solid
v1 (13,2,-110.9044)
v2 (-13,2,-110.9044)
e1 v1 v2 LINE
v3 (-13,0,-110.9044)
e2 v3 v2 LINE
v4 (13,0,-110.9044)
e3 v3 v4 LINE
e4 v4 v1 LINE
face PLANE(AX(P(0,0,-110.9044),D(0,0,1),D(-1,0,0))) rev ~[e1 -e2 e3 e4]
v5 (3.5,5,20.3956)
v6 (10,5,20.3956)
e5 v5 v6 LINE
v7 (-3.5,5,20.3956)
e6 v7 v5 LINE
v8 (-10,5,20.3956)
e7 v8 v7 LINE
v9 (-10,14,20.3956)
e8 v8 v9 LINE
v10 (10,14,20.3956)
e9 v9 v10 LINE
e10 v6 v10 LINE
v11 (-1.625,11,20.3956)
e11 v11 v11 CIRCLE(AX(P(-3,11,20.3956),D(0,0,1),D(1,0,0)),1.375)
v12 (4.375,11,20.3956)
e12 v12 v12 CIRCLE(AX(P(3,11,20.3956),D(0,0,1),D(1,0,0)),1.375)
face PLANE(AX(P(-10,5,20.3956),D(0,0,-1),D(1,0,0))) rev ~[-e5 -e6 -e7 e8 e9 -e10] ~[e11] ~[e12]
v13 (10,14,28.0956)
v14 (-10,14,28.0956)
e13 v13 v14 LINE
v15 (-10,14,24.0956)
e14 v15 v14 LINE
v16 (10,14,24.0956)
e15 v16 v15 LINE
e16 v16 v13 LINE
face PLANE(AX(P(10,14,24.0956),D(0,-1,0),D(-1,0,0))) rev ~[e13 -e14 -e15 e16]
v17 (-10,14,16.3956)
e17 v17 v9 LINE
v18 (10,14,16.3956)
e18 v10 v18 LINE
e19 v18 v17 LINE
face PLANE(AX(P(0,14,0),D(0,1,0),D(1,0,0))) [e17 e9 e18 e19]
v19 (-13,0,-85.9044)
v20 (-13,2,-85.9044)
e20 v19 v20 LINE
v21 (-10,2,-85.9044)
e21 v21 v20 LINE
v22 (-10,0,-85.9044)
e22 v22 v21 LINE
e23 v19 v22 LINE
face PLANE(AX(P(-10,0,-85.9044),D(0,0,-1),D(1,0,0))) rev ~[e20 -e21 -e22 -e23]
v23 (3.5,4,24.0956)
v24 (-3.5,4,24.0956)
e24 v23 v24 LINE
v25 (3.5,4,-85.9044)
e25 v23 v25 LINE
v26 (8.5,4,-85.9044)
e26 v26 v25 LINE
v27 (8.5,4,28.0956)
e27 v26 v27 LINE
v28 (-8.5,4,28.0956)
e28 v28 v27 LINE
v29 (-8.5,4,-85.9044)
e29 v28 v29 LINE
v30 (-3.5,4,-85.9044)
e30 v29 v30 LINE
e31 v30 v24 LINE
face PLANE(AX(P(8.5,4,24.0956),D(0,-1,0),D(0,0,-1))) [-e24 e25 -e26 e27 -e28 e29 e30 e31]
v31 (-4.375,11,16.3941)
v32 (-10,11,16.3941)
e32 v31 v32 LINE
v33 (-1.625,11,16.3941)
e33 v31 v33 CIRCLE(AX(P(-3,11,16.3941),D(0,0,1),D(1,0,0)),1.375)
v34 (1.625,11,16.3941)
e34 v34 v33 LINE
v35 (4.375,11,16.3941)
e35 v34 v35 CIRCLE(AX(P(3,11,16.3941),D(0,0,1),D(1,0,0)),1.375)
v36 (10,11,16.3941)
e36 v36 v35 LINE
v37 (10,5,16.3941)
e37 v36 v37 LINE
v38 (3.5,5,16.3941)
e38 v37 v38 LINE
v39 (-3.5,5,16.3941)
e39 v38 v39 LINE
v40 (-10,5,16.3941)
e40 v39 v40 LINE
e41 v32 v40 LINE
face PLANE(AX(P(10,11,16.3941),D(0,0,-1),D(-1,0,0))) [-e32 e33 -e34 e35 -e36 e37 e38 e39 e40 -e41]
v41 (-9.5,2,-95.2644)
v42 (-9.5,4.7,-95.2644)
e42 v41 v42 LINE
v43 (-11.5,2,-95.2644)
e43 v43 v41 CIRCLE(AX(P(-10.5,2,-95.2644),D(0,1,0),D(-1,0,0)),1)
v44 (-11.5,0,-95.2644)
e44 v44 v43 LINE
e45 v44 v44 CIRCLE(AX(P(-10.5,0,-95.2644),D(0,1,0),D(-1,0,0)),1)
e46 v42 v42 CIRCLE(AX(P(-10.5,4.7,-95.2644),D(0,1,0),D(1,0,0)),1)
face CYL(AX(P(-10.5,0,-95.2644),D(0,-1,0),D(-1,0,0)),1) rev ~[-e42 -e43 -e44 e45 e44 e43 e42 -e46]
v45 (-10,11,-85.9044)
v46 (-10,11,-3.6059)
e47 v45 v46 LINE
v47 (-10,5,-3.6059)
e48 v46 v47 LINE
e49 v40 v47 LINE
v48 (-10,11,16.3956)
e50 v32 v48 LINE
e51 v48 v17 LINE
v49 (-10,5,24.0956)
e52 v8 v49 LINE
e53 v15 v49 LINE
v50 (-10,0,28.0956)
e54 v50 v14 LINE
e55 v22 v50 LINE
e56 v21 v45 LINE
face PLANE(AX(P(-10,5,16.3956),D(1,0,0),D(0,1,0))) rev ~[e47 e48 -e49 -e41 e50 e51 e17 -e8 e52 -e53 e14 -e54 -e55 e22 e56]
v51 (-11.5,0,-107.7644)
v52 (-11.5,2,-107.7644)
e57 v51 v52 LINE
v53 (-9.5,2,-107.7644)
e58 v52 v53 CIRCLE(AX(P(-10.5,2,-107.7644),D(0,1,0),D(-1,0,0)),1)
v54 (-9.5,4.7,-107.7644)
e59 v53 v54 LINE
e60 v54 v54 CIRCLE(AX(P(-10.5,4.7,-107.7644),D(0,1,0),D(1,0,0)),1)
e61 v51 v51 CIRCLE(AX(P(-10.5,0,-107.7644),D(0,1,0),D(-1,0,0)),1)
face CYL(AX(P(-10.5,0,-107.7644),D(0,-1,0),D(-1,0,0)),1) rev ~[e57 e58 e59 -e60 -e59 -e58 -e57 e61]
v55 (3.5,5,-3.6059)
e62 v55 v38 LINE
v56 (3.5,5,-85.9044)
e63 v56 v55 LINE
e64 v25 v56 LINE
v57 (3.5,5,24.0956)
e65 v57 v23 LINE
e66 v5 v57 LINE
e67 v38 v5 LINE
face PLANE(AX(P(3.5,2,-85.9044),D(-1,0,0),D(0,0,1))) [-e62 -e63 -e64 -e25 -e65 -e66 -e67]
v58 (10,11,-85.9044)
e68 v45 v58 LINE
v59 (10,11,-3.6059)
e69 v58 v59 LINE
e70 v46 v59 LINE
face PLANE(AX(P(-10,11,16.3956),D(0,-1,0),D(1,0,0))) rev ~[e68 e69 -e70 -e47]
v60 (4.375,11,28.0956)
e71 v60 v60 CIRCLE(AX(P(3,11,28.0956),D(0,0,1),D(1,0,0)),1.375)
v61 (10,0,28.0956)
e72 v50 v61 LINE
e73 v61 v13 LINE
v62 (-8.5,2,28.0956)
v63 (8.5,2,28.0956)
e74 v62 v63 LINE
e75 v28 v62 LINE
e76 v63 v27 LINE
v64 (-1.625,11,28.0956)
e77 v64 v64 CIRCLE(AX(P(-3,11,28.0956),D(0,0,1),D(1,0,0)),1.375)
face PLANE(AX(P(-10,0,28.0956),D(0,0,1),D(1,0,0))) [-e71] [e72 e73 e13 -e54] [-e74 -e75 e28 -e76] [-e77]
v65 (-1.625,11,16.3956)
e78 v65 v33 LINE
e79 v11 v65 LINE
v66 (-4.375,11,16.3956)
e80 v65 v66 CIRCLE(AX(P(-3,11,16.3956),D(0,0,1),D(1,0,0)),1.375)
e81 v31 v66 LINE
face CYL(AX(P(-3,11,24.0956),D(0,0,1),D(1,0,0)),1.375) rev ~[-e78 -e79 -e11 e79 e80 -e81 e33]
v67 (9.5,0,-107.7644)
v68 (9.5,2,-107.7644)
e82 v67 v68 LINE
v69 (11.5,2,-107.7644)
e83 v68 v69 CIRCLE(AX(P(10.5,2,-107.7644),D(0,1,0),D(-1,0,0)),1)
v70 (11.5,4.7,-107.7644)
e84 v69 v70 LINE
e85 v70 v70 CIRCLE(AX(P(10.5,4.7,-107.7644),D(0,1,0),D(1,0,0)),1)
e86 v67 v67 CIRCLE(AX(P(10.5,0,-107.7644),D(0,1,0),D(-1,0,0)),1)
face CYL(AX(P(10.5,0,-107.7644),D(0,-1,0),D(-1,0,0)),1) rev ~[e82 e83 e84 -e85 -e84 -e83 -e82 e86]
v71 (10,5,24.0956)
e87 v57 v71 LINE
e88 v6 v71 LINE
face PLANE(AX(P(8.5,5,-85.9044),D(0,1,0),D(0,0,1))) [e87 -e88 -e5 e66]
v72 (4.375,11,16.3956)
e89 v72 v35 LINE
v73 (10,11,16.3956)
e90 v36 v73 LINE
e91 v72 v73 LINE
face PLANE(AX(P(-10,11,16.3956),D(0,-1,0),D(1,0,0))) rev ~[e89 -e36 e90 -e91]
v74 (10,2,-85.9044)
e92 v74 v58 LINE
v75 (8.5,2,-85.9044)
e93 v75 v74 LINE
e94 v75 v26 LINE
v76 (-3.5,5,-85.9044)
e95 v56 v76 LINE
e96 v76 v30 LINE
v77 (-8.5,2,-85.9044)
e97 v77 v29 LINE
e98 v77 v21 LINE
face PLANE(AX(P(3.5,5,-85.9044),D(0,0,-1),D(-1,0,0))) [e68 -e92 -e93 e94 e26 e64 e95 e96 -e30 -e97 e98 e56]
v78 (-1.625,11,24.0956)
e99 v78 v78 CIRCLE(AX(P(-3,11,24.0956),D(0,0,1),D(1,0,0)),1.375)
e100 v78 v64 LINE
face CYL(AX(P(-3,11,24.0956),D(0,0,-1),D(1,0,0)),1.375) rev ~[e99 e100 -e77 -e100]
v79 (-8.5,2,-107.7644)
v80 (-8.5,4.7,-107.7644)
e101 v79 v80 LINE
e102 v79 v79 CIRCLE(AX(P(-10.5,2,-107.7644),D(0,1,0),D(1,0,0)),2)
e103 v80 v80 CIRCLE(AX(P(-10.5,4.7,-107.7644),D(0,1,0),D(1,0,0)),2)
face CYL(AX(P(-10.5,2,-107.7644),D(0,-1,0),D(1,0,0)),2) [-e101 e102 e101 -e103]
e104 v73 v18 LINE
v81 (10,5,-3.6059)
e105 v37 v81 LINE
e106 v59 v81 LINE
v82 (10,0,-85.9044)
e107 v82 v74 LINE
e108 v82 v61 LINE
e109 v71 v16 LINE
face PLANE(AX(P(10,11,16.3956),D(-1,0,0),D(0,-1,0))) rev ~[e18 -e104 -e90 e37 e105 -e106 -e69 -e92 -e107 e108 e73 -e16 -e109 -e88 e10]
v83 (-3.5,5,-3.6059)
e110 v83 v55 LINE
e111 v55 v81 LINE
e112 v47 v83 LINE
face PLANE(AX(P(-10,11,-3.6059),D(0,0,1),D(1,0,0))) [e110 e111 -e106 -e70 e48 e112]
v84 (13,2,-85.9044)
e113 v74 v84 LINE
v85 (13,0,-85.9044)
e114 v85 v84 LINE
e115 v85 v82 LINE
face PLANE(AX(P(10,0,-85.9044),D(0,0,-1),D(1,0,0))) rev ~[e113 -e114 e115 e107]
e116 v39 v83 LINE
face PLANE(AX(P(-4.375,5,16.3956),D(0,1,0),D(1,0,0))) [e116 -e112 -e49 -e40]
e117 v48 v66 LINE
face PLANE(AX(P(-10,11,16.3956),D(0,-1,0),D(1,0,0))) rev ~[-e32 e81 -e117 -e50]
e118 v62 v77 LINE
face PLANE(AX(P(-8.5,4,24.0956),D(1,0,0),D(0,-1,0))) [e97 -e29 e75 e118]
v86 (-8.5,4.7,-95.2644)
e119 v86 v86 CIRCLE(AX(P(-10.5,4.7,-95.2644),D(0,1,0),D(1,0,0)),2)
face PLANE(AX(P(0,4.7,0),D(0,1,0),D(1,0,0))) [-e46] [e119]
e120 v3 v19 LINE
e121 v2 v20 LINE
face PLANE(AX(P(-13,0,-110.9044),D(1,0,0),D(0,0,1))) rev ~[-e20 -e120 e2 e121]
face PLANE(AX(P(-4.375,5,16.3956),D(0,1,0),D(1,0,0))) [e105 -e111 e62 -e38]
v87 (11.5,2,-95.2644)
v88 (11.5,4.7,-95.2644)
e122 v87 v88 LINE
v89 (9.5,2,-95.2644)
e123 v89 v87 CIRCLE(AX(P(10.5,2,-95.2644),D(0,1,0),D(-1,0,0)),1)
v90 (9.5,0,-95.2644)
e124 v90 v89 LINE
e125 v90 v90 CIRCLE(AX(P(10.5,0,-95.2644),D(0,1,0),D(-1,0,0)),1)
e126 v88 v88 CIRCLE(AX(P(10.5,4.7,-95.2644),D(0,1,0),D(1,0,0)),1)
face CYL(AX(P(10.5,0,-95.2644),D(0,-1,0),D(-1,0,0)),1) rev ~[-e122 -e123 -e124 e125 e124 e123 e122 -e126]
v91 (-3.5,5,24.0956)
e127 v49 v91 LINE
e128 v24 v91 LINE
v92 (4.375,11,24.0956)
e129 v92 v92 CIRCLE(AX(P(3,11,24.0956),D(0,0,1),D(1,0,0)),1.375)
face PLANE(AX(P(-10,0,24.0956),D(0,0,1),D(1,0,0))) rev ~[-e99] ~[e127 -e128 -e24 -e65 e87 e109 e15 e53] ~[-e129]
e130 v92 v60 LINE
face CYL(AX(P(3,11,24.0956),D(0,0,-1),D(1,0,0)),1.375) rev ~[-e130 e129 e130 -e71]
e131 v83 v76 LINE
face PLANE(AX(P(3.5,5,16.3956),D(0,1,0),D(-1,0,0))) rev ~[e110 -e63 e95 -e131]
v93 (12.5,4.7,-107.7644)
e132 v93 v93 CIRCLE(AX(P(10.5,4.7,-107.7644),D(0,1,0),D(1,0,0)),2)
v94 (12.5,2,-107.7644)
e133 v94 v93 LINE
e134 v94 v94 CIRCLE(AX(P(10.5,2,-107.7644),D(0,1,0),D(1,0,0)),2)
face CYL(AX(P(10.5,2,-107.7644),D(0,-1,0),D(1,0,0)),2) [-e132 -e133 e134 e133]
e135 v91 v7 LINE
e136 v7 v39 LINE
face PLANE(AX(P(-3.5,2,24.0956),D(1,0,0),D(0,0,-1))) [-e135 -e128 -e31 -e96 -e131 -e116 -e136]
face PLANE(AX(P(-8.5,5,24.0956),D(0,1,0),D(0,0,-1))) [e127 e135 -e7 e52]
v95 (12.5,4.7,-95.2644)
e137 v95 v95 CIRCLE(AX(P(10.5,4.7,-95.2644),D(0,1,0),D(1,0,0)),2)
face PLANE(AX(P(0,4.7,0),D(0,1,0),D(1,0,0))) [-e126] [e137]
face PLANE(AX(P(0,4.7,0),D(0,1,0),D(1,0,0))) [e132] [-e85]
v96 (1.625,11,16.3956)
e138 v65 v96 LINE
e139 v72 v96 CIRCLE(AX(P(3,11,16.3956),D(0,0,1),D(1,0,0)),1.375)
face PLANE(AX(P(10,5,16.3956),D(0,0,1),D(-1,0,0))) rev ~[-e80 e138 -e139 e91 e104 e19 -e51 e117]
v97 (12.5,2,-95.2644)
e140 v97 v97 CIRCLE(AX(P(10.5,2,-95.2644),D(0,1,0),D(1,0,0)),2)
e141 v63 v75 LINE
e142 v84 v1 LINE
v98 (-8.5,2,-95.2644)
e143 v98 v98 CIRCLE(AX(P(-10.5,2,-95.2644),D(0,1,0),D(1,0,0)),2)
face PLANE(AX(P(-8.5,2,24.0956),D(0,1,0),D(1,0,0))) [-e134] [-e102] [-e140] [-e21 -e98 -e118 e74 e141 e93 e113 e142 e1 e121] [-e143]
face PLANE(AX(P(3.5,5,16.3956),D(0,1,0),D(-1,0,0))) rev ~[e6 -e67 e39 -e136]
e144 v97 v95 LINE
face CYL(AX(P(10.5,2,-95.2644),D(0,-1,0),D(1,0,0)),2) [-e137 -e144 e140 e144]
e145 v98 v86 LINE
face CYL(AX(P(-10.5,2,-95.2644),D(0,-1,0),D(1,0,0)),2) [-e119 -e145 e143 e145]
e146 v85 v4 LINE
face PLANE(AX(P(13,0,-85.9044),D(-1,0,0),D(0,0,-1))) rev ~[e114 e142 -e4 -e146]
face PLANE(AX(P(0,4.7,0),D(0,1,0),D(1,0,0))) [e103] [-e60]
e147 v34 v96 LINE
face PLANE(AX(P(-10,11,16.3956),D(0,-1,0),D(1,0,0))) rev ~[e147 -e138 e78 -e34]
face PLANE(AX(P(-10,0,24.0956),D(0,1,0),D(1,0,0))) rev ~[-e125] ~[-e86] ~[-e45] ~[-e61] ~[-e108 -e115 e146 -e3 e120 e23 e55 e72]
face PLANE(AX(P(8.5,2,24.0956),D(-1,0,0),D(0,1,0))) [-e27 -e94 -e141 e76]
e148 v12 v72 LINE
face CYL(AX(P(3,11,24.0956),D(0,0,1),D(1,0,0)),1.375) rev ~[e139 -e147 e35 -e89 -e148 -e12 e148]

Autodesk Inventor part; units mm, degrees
ref_plane "YZ Plane" through (0, 0, 0) normal (1, 0, 0) x (0, 1, 0)
ref_plane "XZ Plane" through (0, 0, 0) normal (0, 1, 0) x (-1, 0, 0)
ref_plane "XY Plane" through (0, 0, 0) normal (0, 0, 1) x (1, 0, 0)
sketch "スケッチ1" plane through (0, 0, 0) normal (0, 1, 0) x (-1, 0, 0)
  line L0 (8.5, 24.0956) -> (-8.5, 24.0956)
  line L1 (-8.5, 24.0956) -> (-8.5, -85.9044)
  line L2 (-8.5, -85.9044) -> (8.5, -85.9044)
  line L3 (8.5, -85.9044) -> (8.5, 24.0956)
  line L4 (13, -85.9044) -> (-13, -85.9044)
  line L5 (-13, -85.9044) -> (-13, -110.9044)
  line L6 (-13, -110.9044) -> (13, -110.9044)
  line L7 (13, -110.9044) -> (13, -85.9044)
  circle A0 centre (10.5, -95.2644) radius 1
  circle A1 centre (10.5, -107.7644) radius 1
  line L8 (0, -85.9044) -> (0, -110.9044)
  line L9 (-8.5, -85.9044) -> (-8.5, 24.0956)
  circle A2 centre (-10.5, -95.2644) radius 1
  circle A3 centre (-10.5, -107.7644) radius 1
  line L10 (0, -85.9044) -> (0, 24.0956)
  line L11 (10, -85.9044) -> (10, 24.0956)
  line L12 (10, 24.0956) -> (8.5, 24.0956)
  line L13 (-8.5, -85.9044) -> (-8.5, 24.0956)
  line L14 (-10, -85.9044) -> (-10, 24.0956)
  line L15 (-10, 24.0956) -> (-8.5, 24.0956)
  line L16 (10, 24.0956) -> (-10, 24.0956)
  line L17 (8.5, 24.0956) -> (-8.5, 24.0956)
  line L18 (10, 24.0956) -> (-10, 24.0956)
  point P0 (0, 0)
  point P1 (-8.5, 24.0956)
  dimension "d0" = 17
  dimension "d1" = 110
  dimension "d2" = 26
  dimension "d3" = 25
  dimension "d4" = 4.5
  dimension "d5" = 2
  dimension "d6" = 9.36
  dimension "d7" = 2
  dimension "d8" = 12.5
  dimension "d9" = 2.5
  dimension "d10" = 2.5
  dimension "d11" = 13
  dimension "d12" = 1.5
extrude "押し出し1" add sketch "スケッチ1" along normal blind 2 contours L3 L2 L10 L0 | L10 L2 L1 L0 | L4 L7 L6 L8 L2 | L8 L6 L5 L4 L2
extrude "押し出し2" add sketch "スケッチ1" along normal blind 5 contours L12 L11 L4 L3 | L1 L4 L14 L15
sketch "スケッチ2" plane through (-8.5, 2, 24.0956) normal (1, 0, 0) x (0, 0, -1)
  line L0 (0, 0) -> (0, 3) projected
  line L1 (0, 3) -> (110, 3)
  line L2 (110, 3) -> (110, 2)
  line L3 (110, 2) -> (0, 2)
  line L4 (0, 2) -> (0, 3)
  point P0 (24.0956, -2)
  point P1 (0, 2)
  dimension "d27" = 110
  dimension "d28" = 1
sketch "スケッチ3" plane through (8.5, 2, -85.9044) normal (-1, 0, 0) x (0, 0, 1)
  line L0 (0, 3) -> (110, 3) projected
  line L1 (0, 3) -> (110, 3)
  line L2 (110, 3) -> (110, 2)
  line L3 (110, 2) -> (0, 2)
  line L4 (0, 2) -> (0, 3)
  point P0 (85.9044, -2)
  dimension "d29" = 110
  dimension "d30" = 1
sketch "スケッチ5" plane through (-10, 0, 24.0956) normal (0, 0, 1) x (1, 0, 0)
  line L0 (0, 0) -> (0, 2) projected
  line L1 (0, 0) -> (20, 0)
  line L2 (20, 0) -> (20, 14)
  line L3 (20, 14) -> (0, 14)
  line L4 (0, 14) -> (0, 0)
  line L5 (0, 2) -> (1.5, 2) projected
  line L6 (18.5, 4) -> (13.5, 4) projected
  line L7 (1.5, 2) -> (18.5, 2)
  line L8 (18.5, 2) -> (18.5, 4)
  line L9 (18.5, 4) -> (1.5, 4)
  line L10 (1.5, 4) -> (1.5, 2)
  circle A0 centre (7, 11) radius 1.375
  circle A1 centre (13, 11) radius 1.375
  point P0 (10, 0)
  point P1 (0, 2)
  dimension "d35" = 20
  dimension "d36" = 14
  dimension "d37" = 2.75
  dimension "d38" = 2.75
  dimension "d39" = 3
  dimension "d40" = 3
  dimension "d41" = 6
  dimension "d42" = 7
extrude "押し出し5" add sketch "スケッチ5" along normal blind 4
extrude "押し出し6" add sketch "スケッチ2" along normal blind 5
extrude "押し出し7" add sketch "スケッチ3" along normal blind 5
sketch "スケッチ6" plane through (-10, 0, 28.0956) normal (0, 0, 1) x (1, 0, 0)
  point P0 (10, 0)
sketch "スケッチ8" plane through (0, 2, 0) normal (0, 1, 0) x (1, 0, 0)
  circle A0 centre (10.5, 107.7644) radius 1 projected
  circle A1 centre (10.5, 107.7644) radius 2
  circle A2 centre (-10.5, 107.7644) radius 1 projected
  circle A3 centre (-10.5, 107.7644) radius 2
  circle A4 centre (-10.5, 95.2644) radius 1 projected
  circle A5 centre (-10.5, 95.2644) radius 2
  line L0 (13, 110.9044) -> (-13, 110.9044) projected
  line L1 (0, 110.9044) -> (0, 85.9044)
  circle A6 centre (10.5, 95.2644) radius 2
  circle A7 centre (10.5, 95.2644) radius 1
  point P0 (0, 0)
  dimension "d49" = 4
  dimension "d50" = 4
  dimension "d53" = 4
  dimension "d73" = 25
extrude "押し出し8" add sketch "スケッチ8" along normal blind 2.7
extrude "押し出し9" cut sketch "スケッチ1" along normal blind 4.8 contours A2
sketch "スケッチ9" plane through (0, 5, 0) normal (0, 1, 0) x (1, 0, 0)
  line L0 (-10, 85.9044) -> (-10, -24.0956) projected
  line L1 (10, -24.0956) -> (10, 85.9044) projected
  line L2 (-10, -20.3956) -> (10, -20.3956)
  line L3 (10, -20.3956) -> (10, -16.3956)
  line L4 (10, -16.3956) -> (-10, -16.3956)
  line L5 (-10, -16.3956) -> (-10, -20.3956)
  line L6 (10, -24.0956) -> (-10, -24.0956) projected
  point P0 (0, 0)
  point P1 (10, -20.3956)
  dimension "d57" = 3.7
  dimension "d58" = 4
extrude "押し出し10" add sketch "スケッチ9" along normal blind 9 contours L4 L1 L2 L0
sketch "スケッチ10" plane through (3.5, 5, 16.3956) normal (0, 0, -1) x (-1, 0, 0)
  line L0 (0, 0) -> (-6.5, 0) projected
  line L1 (-6.5, 0) -> (13.5, 0)
  line L2 (13.5, 0) -> (13.5, 6)
  line L3 (13.5, 6) -> (-6.5, 6)
  line L4 (-6.5, 6) -> (-6.5, 0)
  point P0 (3.5, -5)
  dimension "d63" = 20
  dimension "d64" = 6
extrude "押し出し12" add sketch "スケッチ10" along normal blind 102.3
extrude "押し出し13" add sketch "スケッチ10" along normal blind 102
extrude "押し出し11" cut sketch "スケッチ5" against normal blind 8 contours A0 | A1
sketch "スケッチ11" plane through (-4.375, 11, 16.3956) normal (0, 1, 0) x (1, 0, 0)
  line L0 (14.375, -11.7) -> (14.375, 102.3) projected
  line L1 (14.375, 0.0015) -> (-5.625, 0.0015)
  line L2 (-5.625, 0.0015) -> (-5.625, 20.0015)
  line L3 (-5.625, 20.0015) -> (14.375, 20.0015)
  line L4 (14.375, 20.0015) -> (14.375, 0.0015)
  point P0 (4.375, 16.3956)
  dimension "d69" = 20
  dimension "d70" = 20
extrude "押し出し14" cut sketch "スケッチ11" against normal blind 6
properties part number "MouthCameraBase"
